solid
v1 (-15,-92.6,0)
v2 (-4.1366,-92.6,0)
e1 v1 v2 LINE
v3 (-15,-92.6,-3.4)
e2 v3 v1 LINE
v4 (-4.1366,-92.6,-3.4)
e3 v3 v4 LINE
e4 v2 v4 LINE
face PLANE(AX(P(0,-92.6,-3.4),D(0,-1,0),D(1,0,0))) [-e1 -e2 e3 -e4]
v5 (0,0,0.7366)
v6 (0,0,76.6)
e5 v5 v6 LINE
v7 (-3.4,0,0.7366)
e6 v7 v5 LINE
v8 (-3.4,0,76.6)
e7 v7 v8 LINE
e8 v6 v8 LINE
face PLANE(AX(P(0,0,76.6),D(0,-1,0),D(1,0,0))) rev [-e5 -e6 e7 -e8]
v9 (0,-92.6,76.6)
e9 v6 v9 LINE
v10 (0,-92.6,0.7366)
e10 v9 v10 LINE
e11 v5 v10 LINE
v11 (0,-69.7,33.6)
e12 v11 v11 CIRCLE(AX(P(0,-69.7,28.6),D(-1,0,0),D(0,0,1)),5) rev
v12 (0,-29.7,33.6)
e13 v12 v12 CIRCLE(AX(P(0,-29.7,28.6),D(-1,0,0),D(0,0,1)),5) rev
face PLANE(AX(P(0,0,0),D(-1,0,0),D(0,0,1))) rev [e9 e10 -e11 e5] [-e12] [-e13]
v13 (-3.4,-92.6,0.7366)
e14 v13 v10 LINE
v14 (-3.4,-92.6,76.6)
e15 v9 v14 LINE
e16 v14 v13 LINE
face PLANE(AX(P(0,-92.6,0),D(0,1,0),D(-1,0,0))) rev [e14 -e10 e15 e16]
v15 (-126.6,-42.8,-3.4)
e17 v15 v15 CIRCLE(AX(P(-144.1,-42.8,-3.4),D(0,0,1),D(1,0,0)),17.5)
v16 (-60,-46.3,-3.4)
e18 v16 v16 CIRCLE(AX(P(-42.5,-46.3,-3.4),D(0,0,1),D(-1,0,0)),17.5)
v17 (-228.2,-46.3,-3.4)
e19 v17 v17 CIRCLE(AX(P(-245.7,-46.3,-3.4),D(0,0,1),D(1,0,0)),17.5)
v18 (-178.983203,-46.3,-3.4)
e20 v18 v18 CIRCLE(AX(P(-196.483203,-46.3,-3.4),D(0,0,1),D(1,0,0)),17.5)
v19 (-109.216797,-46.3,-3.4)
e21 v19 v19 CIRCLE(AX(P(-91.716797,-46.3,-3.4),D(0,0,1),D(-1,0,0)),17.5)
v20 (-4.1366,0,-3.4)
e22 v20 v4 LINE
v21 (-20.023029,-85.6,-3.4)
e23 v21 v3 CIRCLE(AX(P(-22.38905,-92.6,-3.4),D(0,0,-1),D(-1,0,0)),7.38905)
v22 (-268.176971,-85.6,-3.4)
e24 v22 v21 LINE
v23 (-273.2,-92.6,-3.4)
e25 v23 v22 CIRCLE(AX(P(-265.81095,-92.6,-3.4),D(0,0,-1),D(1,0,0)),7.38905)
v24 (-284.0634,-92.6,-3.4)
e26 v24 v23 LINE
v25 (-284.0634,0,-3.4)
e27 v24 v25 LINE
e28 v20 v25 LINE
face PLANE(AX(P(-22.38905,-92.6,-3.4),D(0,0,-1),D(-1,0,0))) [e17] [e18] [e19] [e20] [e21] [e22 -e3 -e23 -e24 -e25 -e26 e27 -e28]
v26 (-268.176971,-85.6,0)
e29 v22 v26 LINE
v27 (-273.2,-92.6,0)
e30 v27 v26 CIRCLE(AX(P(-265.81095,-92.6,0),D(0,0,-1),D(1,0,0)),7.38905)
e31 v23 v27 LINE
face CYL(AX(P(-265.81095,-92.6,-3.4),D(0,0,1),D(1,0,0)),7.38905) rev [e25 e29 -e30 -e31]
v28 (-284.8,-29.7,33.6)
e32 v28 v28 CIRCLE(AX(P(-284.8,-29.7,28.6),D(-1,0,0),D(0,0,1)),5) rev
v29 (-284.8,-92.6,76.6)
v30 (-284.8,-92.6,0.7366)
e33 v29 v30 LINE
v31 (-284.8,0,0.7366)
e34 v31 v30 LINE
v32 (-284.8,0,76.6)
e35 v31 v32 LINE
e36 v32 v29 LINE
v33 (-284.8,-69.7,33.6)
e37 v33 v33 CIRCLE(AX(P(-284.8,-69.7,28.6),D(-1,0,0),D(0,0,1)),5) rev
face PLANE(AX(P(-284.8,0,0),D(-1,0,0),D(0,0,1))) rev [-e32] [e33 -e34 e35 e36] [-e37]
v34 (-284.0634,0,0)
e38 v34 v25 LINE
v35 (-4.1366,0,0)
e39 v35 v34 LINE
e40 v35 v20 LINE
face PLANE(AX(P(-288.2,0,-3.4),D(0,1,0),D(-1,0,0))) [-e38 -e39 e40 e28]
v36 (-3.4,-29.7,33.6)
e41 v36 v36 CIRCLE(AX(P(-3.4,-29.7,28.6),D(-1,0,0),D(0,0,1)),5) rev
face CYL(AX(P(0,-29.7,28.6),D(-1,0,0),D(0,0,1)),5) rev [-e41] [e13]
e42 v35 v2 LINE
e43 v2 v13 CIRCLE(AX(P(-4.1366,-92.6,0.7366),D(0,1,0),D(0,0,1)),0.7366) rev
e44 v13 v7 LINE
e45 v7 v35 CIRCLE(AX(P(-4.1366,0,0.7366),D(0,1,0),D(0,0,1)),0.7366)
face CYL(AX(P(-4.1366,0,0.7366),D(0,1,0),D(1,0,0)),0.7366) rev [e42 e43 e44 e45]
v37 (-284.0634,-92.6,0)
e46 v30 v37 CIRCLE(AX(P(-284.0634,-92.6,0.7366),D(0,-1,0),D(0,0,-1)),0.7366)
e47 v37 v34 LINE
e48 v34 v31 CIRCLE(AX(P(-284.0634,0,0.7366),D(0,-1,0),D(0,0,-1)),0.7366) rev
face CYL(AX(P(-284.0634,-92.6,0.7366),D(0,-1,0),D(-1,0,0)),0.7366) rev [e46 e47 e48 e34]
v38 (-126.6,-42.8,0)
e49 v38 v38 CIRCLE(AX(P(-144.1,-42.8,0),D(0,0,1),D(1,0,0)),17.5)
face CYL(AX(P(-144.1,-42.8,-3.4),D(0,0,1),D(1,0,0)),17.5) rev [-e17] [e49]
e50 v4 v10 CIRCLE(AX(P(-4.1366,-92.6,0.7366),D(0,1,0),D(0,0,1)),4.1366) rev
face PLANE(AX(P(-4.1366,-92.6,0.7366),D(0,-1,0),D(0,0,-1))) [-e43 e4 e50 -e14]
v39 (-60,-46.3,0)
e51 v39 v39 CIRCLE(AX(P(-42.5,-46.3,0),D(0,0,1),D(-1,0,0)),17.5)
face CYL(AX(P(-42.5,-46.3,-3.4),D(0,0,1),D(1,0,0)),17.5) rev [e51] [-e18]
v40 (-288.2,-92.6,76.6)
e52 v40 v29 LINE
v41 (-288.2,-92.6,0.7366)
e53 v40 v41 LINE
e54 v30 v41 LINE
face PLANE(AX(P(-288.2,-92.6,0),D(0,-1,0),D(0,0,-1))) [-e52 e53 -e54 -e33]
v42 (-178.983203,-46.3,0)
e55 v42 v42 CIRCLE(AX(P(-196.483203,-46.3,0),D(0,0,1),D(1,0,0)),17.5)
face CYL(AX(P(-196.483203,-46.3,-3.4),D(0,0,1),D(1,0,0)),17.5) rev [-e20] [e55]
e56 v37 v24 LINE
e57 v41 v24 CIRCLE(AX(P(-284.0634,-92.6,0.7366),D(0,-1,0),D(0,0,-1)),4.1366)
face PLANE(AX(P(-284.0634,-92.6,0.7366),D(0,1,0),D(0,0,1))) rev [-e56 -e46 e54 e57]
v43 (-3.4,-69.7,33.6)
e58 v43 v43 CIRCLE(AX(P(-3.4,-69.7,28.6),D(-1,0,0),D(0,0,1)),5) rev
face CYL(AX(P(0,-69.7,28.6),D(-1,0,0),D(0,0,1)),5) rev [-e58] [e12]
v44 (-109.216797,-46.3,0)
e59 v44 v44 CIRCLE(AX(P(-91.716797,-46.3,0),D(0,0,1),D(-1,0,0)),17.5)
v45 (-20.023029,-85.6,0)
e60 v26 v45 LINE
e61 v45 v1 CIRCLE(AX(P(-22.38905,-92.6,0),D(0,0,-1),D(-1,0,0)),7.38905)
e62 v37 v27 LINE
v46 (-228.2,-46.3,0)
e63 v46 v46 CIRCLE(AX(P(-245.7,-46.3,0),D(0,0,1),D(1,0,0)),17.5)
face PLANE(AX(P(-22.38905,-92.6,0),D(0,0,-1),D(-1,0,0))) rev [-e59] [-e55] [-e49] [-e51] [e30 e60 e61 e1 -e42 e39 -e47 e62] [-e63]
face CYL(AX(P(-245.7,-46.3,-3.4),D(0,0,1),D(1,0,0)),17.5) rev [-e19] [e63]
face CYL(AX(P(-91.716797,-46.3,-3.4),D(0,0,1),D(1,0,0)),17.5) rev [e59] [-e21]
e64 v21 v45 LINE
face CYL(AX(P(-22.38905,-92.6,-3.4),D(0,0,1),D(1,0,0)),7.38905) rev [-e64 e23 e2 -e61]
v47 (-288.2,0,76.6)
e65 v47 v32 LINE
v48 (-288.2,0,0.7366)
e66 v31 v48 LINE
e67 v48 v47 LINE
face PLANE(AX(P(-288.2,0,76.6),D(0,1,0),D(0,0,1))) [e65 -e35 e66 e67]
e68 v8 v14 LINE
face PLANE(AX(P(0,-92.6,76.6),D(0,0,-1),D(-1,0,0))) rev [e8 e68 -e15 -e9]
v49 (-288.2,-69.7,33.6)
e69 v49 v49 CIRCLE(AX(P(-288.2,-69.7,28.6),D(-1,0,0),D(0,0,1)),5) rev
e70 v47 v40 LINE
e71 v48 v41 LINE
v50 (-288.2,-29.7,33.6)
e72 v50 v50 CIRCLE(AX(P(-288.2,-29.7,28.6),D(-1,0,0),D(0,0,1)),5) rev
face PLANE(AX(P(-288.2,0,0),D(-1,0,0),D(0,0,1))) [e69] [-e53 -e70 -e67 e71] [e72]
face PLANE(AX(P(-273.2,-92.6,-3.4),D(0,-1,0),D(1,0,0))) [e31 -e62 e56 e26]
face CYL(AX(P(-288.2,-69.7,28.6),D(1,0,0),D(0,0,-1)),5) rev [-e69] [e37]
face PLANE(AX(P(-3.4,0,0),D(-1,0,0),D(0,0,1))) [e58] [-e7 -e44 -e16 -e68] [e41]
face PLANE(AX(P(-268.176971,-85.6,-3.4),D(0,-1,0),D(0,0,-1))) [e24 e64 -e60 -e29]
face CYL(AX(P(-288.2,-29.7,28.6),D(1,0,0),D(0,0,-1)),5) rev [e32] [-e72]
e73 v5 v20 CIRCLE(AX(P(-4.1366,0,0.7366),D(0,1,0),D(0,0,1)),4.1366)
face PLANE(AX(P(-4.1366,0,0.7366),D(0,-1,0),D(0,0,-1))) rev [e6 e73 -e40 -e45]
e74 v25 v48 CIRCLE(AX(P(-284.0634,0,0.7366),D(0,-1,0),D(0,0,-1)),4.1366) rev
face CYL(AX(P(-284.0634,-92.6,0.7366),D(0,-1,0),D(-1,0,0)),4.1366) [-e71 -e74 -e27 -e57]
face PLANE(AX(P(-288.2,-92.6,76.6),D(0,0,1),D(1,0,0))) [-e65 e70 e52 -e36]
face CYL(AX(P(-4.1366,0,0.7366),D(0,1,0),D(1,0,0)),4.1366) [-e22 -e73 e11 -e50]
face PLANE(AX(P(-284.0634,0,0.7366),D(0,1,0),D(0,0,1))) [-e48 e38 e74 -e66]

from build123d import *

# Parameters (mm, degrees)
BASE_FLANGE1_START           = -3.4
BASE_FLANGE1_OUTLINE_R       = 17.5
BASE_FLANGE1_DEPTH           = 3.4
EDGE_FLANGE2_STRIP_W         = 15.0732
EDGE_FLANGE2_STRIP_H         = 3.4
EDGE_FLANGE2_STRIP_CUT_DEPTH = 92.6
EDGE_FLANGE2_DEPTH           = 92.6
EDGE_FLANGE2_PROFILE_W       = 92.6
EDGE_FLANGE2_PROFILE_H       = 75.8634
EDGE_FLANGE2_PROFILE_R       = 5
EDGE_FLANGE2_FLAT_DEPTH      = 3.4
EDGE_FLANGE3_STRIP_W         = 15.0732
EDGE_FLANGE3_STRIP_H         = 3.4
EDGE_FLANGE3_STRIP_CUT_DEPTH = 92.6
EDGE_FLANGE3_DEPTH           = 92.6
EDGE_FLANGE3_PROFILE_W       = 92.6
EDGE_FLANGE3_PROFILE_H       = 75.8634
EDGE_FLANGE3_PROFILE_R       = 5
EDGE_FLANGE3_FLAT_DEPTH      = 3.4


# Read off the part's stored shape, not the designer's step: Base-Flange1
# Sheet-metal steps are written as plain solids
with BuildPart() as part:
    # Base-Flange1 outline → Base-Flange1 (new body)
    with BuildSketch(Plane.XY.offset(BASE_FLANGE1_START)):
        with BuildLine():
            Line((0, -92.6), (0, 0))
            Line((0, 0), (-288.2, 0))
            Line((-288.2, 0), (-288.2, -92.6))
            Line((-288.2, -92.6), (-273.2, -92.6))
            ThreePointArc((-273.2, -92.6), (-271.814311921, -88.29213457), (-268.176971207, -85.6))
            Line((-268.176971207, -85.6), (-20.023028793, -85.6))
            ThreePointArc((-20.023028793, -85.6), (-16.385688079, -88.29213457), (-15, -92.6))
            Line((-15, -92.6), (0, -92.6))
        make_face()
        with Locations((-245.7, -46.3)):
            Circle(BASE_FLANGE1_OUTLINE_R, mode=Mode.SUBTRACT)
        with Locations((-196.483203415, -46.3)):
            Circle(BASE_FLANGE1_OUTLINE_R, mode=Mode.SUBTRACT)
        with Locations((-144.1, -42.8)):
            Circle(BASE_FLANGE1_OUTLINE_R, mode=Mode.SUBTRACT)
        with Locations((-91.716796585, -46.3)):
            Circle(BASE_FLANGE1_OUTLINE_R, mode=Mode.SUBTRACT)
        with Locations((-42.5, -46.3)):
            Circle(BASE_FLANGE1_OUTLINE_R, mode=Mode.SUBTRACT)
    extrude(amount=BASE_FLANGE1_DEPTH)

    # Edge-Flange2 strip (across the edge) → Edge-Flange2 strip cut (cut)
    with BuildSketch(Plane(origin=(-288.2, 0, 0), x_dir=(1, 0, 0), z_dir=(0, -1, 0))):
        with Locations((-3.4, -1.7)):
            Rectangle(EDGE_FLANGE2_STRIP_W, EDGE_FLANGE2_STRIP_H)
    extrude(amount=EDGE_FLANGE2_STRIP_CUT_DEPTH, mode=Mode.SUBTRACT)

    # Edge-Flange2 bend section (across the edge) → Edge-Flange2 (add)
    with BuildSketch(Plane(origin=(-288.2, 0, 0), x_dir=(1, 0, 0), z_dir=(0, -1, 0))):
        with BuildLine():
            Line((0, 0.7366), (3.4, 0.7366))
            ThreePointArc((3.4, 0.7366), (3.615745145, 0.215745145), (4.1366, 0))
            Line((4.1366, 0), (4.1366, -3.4))
            ThreePointArc((4.1366, -3.4), (1.211582089, -2.188417911), (0, 0.7366))
        make_face()
    extrude(amount=EDGE_FLANGE2_DEPTH)

    # Edge-Flange2 profile (on flange) → Edge-Flange2 flat (add)
    with BuildSketch(Plane.YZ.offset(-288.2)):
        with Locations((-46.3, 38.6683)):
            Rectangle(EDGE_FLANGE2_PROFILE_W, EDGE_FLANGE2_PROFILE_H)
        with Locations((-29.7, 28.6)):
            Circle(EDGE_FLANGE2_PROFILE_R, mode=Mode.SUBTRACT)
        with Locations((-69.7, 28.6)):
            Circle(EDGE_FLANGE2_PROFILE_R, mode=Mode.SUBTRACT)
    extrude(amount=EDGE_FLANGE2_FLAT_DEPTH)

    # Edge-Flange3 strip (across the edge) → Edge-Flange3 strip cut (cut)
    with BuildSketch(Plane(origin=(0, -92.6, 0), x_dir=(-1, 0, 0), z_dir=(0, 1, 0))):
        with Locations((-3.4, -1.7)):
            Rectangle(EDGE_FLANGE3_STRIP_W, EDGE_FLANGE3_STRIP_H)
    extrude(amount=EDGE_FLANGE3_STRIP_CUT_DEPTH, mode=Mode.SUBTRACT)

    # Edge-Flange3 bend section (across the edge) → Edge-Flange3 (add)
    with BuildSketch(Plane(origin=(0, -92.6, 0), x_dir=(-1, 0, 0), z_dir=(0, 1, 0))):
        with BuildLine():
            Line((0, 0.7366), (3.4, 0.7366))
            ThreePointArc((3.4, 0.7366), (3.615745145, 0.215745145), (4.1366, 0))
            Line((4.1366, 0), (4.1366, -3.4))
            ThreePointArc((4.1366, -3.4), (1.211582089, -2.188417911), (0, 0.7366))
        make_face()
    extrude(amount=EDGE_FLANGE3_DEPTH)

    # Edge-Flange3 profile (on flange) → Edge-Flange3 flat (add)
    with BuildSketch(Plane.YZ):
        with Locations((-46.3, 38.6683)):
            Rectangle(EDGE_FLANGE3_PROFILE_W, EDGE_FLANGE3_PROFILE_H)
        with Locations((-69.7, 28.6)):
            Circle(EDGE_FLANGE3_PROFILE_R, mode=Mode.SUBTRACT)
        with Locations((-29.7, 28.6)):
            Circle(EDGE_FLANGE3_PROFILE_R, mode=Mode.SUBTRACT)
    extrude(amount=-EDGE_FLANGE3_FLAT_DEPTH)


solid = part.part
